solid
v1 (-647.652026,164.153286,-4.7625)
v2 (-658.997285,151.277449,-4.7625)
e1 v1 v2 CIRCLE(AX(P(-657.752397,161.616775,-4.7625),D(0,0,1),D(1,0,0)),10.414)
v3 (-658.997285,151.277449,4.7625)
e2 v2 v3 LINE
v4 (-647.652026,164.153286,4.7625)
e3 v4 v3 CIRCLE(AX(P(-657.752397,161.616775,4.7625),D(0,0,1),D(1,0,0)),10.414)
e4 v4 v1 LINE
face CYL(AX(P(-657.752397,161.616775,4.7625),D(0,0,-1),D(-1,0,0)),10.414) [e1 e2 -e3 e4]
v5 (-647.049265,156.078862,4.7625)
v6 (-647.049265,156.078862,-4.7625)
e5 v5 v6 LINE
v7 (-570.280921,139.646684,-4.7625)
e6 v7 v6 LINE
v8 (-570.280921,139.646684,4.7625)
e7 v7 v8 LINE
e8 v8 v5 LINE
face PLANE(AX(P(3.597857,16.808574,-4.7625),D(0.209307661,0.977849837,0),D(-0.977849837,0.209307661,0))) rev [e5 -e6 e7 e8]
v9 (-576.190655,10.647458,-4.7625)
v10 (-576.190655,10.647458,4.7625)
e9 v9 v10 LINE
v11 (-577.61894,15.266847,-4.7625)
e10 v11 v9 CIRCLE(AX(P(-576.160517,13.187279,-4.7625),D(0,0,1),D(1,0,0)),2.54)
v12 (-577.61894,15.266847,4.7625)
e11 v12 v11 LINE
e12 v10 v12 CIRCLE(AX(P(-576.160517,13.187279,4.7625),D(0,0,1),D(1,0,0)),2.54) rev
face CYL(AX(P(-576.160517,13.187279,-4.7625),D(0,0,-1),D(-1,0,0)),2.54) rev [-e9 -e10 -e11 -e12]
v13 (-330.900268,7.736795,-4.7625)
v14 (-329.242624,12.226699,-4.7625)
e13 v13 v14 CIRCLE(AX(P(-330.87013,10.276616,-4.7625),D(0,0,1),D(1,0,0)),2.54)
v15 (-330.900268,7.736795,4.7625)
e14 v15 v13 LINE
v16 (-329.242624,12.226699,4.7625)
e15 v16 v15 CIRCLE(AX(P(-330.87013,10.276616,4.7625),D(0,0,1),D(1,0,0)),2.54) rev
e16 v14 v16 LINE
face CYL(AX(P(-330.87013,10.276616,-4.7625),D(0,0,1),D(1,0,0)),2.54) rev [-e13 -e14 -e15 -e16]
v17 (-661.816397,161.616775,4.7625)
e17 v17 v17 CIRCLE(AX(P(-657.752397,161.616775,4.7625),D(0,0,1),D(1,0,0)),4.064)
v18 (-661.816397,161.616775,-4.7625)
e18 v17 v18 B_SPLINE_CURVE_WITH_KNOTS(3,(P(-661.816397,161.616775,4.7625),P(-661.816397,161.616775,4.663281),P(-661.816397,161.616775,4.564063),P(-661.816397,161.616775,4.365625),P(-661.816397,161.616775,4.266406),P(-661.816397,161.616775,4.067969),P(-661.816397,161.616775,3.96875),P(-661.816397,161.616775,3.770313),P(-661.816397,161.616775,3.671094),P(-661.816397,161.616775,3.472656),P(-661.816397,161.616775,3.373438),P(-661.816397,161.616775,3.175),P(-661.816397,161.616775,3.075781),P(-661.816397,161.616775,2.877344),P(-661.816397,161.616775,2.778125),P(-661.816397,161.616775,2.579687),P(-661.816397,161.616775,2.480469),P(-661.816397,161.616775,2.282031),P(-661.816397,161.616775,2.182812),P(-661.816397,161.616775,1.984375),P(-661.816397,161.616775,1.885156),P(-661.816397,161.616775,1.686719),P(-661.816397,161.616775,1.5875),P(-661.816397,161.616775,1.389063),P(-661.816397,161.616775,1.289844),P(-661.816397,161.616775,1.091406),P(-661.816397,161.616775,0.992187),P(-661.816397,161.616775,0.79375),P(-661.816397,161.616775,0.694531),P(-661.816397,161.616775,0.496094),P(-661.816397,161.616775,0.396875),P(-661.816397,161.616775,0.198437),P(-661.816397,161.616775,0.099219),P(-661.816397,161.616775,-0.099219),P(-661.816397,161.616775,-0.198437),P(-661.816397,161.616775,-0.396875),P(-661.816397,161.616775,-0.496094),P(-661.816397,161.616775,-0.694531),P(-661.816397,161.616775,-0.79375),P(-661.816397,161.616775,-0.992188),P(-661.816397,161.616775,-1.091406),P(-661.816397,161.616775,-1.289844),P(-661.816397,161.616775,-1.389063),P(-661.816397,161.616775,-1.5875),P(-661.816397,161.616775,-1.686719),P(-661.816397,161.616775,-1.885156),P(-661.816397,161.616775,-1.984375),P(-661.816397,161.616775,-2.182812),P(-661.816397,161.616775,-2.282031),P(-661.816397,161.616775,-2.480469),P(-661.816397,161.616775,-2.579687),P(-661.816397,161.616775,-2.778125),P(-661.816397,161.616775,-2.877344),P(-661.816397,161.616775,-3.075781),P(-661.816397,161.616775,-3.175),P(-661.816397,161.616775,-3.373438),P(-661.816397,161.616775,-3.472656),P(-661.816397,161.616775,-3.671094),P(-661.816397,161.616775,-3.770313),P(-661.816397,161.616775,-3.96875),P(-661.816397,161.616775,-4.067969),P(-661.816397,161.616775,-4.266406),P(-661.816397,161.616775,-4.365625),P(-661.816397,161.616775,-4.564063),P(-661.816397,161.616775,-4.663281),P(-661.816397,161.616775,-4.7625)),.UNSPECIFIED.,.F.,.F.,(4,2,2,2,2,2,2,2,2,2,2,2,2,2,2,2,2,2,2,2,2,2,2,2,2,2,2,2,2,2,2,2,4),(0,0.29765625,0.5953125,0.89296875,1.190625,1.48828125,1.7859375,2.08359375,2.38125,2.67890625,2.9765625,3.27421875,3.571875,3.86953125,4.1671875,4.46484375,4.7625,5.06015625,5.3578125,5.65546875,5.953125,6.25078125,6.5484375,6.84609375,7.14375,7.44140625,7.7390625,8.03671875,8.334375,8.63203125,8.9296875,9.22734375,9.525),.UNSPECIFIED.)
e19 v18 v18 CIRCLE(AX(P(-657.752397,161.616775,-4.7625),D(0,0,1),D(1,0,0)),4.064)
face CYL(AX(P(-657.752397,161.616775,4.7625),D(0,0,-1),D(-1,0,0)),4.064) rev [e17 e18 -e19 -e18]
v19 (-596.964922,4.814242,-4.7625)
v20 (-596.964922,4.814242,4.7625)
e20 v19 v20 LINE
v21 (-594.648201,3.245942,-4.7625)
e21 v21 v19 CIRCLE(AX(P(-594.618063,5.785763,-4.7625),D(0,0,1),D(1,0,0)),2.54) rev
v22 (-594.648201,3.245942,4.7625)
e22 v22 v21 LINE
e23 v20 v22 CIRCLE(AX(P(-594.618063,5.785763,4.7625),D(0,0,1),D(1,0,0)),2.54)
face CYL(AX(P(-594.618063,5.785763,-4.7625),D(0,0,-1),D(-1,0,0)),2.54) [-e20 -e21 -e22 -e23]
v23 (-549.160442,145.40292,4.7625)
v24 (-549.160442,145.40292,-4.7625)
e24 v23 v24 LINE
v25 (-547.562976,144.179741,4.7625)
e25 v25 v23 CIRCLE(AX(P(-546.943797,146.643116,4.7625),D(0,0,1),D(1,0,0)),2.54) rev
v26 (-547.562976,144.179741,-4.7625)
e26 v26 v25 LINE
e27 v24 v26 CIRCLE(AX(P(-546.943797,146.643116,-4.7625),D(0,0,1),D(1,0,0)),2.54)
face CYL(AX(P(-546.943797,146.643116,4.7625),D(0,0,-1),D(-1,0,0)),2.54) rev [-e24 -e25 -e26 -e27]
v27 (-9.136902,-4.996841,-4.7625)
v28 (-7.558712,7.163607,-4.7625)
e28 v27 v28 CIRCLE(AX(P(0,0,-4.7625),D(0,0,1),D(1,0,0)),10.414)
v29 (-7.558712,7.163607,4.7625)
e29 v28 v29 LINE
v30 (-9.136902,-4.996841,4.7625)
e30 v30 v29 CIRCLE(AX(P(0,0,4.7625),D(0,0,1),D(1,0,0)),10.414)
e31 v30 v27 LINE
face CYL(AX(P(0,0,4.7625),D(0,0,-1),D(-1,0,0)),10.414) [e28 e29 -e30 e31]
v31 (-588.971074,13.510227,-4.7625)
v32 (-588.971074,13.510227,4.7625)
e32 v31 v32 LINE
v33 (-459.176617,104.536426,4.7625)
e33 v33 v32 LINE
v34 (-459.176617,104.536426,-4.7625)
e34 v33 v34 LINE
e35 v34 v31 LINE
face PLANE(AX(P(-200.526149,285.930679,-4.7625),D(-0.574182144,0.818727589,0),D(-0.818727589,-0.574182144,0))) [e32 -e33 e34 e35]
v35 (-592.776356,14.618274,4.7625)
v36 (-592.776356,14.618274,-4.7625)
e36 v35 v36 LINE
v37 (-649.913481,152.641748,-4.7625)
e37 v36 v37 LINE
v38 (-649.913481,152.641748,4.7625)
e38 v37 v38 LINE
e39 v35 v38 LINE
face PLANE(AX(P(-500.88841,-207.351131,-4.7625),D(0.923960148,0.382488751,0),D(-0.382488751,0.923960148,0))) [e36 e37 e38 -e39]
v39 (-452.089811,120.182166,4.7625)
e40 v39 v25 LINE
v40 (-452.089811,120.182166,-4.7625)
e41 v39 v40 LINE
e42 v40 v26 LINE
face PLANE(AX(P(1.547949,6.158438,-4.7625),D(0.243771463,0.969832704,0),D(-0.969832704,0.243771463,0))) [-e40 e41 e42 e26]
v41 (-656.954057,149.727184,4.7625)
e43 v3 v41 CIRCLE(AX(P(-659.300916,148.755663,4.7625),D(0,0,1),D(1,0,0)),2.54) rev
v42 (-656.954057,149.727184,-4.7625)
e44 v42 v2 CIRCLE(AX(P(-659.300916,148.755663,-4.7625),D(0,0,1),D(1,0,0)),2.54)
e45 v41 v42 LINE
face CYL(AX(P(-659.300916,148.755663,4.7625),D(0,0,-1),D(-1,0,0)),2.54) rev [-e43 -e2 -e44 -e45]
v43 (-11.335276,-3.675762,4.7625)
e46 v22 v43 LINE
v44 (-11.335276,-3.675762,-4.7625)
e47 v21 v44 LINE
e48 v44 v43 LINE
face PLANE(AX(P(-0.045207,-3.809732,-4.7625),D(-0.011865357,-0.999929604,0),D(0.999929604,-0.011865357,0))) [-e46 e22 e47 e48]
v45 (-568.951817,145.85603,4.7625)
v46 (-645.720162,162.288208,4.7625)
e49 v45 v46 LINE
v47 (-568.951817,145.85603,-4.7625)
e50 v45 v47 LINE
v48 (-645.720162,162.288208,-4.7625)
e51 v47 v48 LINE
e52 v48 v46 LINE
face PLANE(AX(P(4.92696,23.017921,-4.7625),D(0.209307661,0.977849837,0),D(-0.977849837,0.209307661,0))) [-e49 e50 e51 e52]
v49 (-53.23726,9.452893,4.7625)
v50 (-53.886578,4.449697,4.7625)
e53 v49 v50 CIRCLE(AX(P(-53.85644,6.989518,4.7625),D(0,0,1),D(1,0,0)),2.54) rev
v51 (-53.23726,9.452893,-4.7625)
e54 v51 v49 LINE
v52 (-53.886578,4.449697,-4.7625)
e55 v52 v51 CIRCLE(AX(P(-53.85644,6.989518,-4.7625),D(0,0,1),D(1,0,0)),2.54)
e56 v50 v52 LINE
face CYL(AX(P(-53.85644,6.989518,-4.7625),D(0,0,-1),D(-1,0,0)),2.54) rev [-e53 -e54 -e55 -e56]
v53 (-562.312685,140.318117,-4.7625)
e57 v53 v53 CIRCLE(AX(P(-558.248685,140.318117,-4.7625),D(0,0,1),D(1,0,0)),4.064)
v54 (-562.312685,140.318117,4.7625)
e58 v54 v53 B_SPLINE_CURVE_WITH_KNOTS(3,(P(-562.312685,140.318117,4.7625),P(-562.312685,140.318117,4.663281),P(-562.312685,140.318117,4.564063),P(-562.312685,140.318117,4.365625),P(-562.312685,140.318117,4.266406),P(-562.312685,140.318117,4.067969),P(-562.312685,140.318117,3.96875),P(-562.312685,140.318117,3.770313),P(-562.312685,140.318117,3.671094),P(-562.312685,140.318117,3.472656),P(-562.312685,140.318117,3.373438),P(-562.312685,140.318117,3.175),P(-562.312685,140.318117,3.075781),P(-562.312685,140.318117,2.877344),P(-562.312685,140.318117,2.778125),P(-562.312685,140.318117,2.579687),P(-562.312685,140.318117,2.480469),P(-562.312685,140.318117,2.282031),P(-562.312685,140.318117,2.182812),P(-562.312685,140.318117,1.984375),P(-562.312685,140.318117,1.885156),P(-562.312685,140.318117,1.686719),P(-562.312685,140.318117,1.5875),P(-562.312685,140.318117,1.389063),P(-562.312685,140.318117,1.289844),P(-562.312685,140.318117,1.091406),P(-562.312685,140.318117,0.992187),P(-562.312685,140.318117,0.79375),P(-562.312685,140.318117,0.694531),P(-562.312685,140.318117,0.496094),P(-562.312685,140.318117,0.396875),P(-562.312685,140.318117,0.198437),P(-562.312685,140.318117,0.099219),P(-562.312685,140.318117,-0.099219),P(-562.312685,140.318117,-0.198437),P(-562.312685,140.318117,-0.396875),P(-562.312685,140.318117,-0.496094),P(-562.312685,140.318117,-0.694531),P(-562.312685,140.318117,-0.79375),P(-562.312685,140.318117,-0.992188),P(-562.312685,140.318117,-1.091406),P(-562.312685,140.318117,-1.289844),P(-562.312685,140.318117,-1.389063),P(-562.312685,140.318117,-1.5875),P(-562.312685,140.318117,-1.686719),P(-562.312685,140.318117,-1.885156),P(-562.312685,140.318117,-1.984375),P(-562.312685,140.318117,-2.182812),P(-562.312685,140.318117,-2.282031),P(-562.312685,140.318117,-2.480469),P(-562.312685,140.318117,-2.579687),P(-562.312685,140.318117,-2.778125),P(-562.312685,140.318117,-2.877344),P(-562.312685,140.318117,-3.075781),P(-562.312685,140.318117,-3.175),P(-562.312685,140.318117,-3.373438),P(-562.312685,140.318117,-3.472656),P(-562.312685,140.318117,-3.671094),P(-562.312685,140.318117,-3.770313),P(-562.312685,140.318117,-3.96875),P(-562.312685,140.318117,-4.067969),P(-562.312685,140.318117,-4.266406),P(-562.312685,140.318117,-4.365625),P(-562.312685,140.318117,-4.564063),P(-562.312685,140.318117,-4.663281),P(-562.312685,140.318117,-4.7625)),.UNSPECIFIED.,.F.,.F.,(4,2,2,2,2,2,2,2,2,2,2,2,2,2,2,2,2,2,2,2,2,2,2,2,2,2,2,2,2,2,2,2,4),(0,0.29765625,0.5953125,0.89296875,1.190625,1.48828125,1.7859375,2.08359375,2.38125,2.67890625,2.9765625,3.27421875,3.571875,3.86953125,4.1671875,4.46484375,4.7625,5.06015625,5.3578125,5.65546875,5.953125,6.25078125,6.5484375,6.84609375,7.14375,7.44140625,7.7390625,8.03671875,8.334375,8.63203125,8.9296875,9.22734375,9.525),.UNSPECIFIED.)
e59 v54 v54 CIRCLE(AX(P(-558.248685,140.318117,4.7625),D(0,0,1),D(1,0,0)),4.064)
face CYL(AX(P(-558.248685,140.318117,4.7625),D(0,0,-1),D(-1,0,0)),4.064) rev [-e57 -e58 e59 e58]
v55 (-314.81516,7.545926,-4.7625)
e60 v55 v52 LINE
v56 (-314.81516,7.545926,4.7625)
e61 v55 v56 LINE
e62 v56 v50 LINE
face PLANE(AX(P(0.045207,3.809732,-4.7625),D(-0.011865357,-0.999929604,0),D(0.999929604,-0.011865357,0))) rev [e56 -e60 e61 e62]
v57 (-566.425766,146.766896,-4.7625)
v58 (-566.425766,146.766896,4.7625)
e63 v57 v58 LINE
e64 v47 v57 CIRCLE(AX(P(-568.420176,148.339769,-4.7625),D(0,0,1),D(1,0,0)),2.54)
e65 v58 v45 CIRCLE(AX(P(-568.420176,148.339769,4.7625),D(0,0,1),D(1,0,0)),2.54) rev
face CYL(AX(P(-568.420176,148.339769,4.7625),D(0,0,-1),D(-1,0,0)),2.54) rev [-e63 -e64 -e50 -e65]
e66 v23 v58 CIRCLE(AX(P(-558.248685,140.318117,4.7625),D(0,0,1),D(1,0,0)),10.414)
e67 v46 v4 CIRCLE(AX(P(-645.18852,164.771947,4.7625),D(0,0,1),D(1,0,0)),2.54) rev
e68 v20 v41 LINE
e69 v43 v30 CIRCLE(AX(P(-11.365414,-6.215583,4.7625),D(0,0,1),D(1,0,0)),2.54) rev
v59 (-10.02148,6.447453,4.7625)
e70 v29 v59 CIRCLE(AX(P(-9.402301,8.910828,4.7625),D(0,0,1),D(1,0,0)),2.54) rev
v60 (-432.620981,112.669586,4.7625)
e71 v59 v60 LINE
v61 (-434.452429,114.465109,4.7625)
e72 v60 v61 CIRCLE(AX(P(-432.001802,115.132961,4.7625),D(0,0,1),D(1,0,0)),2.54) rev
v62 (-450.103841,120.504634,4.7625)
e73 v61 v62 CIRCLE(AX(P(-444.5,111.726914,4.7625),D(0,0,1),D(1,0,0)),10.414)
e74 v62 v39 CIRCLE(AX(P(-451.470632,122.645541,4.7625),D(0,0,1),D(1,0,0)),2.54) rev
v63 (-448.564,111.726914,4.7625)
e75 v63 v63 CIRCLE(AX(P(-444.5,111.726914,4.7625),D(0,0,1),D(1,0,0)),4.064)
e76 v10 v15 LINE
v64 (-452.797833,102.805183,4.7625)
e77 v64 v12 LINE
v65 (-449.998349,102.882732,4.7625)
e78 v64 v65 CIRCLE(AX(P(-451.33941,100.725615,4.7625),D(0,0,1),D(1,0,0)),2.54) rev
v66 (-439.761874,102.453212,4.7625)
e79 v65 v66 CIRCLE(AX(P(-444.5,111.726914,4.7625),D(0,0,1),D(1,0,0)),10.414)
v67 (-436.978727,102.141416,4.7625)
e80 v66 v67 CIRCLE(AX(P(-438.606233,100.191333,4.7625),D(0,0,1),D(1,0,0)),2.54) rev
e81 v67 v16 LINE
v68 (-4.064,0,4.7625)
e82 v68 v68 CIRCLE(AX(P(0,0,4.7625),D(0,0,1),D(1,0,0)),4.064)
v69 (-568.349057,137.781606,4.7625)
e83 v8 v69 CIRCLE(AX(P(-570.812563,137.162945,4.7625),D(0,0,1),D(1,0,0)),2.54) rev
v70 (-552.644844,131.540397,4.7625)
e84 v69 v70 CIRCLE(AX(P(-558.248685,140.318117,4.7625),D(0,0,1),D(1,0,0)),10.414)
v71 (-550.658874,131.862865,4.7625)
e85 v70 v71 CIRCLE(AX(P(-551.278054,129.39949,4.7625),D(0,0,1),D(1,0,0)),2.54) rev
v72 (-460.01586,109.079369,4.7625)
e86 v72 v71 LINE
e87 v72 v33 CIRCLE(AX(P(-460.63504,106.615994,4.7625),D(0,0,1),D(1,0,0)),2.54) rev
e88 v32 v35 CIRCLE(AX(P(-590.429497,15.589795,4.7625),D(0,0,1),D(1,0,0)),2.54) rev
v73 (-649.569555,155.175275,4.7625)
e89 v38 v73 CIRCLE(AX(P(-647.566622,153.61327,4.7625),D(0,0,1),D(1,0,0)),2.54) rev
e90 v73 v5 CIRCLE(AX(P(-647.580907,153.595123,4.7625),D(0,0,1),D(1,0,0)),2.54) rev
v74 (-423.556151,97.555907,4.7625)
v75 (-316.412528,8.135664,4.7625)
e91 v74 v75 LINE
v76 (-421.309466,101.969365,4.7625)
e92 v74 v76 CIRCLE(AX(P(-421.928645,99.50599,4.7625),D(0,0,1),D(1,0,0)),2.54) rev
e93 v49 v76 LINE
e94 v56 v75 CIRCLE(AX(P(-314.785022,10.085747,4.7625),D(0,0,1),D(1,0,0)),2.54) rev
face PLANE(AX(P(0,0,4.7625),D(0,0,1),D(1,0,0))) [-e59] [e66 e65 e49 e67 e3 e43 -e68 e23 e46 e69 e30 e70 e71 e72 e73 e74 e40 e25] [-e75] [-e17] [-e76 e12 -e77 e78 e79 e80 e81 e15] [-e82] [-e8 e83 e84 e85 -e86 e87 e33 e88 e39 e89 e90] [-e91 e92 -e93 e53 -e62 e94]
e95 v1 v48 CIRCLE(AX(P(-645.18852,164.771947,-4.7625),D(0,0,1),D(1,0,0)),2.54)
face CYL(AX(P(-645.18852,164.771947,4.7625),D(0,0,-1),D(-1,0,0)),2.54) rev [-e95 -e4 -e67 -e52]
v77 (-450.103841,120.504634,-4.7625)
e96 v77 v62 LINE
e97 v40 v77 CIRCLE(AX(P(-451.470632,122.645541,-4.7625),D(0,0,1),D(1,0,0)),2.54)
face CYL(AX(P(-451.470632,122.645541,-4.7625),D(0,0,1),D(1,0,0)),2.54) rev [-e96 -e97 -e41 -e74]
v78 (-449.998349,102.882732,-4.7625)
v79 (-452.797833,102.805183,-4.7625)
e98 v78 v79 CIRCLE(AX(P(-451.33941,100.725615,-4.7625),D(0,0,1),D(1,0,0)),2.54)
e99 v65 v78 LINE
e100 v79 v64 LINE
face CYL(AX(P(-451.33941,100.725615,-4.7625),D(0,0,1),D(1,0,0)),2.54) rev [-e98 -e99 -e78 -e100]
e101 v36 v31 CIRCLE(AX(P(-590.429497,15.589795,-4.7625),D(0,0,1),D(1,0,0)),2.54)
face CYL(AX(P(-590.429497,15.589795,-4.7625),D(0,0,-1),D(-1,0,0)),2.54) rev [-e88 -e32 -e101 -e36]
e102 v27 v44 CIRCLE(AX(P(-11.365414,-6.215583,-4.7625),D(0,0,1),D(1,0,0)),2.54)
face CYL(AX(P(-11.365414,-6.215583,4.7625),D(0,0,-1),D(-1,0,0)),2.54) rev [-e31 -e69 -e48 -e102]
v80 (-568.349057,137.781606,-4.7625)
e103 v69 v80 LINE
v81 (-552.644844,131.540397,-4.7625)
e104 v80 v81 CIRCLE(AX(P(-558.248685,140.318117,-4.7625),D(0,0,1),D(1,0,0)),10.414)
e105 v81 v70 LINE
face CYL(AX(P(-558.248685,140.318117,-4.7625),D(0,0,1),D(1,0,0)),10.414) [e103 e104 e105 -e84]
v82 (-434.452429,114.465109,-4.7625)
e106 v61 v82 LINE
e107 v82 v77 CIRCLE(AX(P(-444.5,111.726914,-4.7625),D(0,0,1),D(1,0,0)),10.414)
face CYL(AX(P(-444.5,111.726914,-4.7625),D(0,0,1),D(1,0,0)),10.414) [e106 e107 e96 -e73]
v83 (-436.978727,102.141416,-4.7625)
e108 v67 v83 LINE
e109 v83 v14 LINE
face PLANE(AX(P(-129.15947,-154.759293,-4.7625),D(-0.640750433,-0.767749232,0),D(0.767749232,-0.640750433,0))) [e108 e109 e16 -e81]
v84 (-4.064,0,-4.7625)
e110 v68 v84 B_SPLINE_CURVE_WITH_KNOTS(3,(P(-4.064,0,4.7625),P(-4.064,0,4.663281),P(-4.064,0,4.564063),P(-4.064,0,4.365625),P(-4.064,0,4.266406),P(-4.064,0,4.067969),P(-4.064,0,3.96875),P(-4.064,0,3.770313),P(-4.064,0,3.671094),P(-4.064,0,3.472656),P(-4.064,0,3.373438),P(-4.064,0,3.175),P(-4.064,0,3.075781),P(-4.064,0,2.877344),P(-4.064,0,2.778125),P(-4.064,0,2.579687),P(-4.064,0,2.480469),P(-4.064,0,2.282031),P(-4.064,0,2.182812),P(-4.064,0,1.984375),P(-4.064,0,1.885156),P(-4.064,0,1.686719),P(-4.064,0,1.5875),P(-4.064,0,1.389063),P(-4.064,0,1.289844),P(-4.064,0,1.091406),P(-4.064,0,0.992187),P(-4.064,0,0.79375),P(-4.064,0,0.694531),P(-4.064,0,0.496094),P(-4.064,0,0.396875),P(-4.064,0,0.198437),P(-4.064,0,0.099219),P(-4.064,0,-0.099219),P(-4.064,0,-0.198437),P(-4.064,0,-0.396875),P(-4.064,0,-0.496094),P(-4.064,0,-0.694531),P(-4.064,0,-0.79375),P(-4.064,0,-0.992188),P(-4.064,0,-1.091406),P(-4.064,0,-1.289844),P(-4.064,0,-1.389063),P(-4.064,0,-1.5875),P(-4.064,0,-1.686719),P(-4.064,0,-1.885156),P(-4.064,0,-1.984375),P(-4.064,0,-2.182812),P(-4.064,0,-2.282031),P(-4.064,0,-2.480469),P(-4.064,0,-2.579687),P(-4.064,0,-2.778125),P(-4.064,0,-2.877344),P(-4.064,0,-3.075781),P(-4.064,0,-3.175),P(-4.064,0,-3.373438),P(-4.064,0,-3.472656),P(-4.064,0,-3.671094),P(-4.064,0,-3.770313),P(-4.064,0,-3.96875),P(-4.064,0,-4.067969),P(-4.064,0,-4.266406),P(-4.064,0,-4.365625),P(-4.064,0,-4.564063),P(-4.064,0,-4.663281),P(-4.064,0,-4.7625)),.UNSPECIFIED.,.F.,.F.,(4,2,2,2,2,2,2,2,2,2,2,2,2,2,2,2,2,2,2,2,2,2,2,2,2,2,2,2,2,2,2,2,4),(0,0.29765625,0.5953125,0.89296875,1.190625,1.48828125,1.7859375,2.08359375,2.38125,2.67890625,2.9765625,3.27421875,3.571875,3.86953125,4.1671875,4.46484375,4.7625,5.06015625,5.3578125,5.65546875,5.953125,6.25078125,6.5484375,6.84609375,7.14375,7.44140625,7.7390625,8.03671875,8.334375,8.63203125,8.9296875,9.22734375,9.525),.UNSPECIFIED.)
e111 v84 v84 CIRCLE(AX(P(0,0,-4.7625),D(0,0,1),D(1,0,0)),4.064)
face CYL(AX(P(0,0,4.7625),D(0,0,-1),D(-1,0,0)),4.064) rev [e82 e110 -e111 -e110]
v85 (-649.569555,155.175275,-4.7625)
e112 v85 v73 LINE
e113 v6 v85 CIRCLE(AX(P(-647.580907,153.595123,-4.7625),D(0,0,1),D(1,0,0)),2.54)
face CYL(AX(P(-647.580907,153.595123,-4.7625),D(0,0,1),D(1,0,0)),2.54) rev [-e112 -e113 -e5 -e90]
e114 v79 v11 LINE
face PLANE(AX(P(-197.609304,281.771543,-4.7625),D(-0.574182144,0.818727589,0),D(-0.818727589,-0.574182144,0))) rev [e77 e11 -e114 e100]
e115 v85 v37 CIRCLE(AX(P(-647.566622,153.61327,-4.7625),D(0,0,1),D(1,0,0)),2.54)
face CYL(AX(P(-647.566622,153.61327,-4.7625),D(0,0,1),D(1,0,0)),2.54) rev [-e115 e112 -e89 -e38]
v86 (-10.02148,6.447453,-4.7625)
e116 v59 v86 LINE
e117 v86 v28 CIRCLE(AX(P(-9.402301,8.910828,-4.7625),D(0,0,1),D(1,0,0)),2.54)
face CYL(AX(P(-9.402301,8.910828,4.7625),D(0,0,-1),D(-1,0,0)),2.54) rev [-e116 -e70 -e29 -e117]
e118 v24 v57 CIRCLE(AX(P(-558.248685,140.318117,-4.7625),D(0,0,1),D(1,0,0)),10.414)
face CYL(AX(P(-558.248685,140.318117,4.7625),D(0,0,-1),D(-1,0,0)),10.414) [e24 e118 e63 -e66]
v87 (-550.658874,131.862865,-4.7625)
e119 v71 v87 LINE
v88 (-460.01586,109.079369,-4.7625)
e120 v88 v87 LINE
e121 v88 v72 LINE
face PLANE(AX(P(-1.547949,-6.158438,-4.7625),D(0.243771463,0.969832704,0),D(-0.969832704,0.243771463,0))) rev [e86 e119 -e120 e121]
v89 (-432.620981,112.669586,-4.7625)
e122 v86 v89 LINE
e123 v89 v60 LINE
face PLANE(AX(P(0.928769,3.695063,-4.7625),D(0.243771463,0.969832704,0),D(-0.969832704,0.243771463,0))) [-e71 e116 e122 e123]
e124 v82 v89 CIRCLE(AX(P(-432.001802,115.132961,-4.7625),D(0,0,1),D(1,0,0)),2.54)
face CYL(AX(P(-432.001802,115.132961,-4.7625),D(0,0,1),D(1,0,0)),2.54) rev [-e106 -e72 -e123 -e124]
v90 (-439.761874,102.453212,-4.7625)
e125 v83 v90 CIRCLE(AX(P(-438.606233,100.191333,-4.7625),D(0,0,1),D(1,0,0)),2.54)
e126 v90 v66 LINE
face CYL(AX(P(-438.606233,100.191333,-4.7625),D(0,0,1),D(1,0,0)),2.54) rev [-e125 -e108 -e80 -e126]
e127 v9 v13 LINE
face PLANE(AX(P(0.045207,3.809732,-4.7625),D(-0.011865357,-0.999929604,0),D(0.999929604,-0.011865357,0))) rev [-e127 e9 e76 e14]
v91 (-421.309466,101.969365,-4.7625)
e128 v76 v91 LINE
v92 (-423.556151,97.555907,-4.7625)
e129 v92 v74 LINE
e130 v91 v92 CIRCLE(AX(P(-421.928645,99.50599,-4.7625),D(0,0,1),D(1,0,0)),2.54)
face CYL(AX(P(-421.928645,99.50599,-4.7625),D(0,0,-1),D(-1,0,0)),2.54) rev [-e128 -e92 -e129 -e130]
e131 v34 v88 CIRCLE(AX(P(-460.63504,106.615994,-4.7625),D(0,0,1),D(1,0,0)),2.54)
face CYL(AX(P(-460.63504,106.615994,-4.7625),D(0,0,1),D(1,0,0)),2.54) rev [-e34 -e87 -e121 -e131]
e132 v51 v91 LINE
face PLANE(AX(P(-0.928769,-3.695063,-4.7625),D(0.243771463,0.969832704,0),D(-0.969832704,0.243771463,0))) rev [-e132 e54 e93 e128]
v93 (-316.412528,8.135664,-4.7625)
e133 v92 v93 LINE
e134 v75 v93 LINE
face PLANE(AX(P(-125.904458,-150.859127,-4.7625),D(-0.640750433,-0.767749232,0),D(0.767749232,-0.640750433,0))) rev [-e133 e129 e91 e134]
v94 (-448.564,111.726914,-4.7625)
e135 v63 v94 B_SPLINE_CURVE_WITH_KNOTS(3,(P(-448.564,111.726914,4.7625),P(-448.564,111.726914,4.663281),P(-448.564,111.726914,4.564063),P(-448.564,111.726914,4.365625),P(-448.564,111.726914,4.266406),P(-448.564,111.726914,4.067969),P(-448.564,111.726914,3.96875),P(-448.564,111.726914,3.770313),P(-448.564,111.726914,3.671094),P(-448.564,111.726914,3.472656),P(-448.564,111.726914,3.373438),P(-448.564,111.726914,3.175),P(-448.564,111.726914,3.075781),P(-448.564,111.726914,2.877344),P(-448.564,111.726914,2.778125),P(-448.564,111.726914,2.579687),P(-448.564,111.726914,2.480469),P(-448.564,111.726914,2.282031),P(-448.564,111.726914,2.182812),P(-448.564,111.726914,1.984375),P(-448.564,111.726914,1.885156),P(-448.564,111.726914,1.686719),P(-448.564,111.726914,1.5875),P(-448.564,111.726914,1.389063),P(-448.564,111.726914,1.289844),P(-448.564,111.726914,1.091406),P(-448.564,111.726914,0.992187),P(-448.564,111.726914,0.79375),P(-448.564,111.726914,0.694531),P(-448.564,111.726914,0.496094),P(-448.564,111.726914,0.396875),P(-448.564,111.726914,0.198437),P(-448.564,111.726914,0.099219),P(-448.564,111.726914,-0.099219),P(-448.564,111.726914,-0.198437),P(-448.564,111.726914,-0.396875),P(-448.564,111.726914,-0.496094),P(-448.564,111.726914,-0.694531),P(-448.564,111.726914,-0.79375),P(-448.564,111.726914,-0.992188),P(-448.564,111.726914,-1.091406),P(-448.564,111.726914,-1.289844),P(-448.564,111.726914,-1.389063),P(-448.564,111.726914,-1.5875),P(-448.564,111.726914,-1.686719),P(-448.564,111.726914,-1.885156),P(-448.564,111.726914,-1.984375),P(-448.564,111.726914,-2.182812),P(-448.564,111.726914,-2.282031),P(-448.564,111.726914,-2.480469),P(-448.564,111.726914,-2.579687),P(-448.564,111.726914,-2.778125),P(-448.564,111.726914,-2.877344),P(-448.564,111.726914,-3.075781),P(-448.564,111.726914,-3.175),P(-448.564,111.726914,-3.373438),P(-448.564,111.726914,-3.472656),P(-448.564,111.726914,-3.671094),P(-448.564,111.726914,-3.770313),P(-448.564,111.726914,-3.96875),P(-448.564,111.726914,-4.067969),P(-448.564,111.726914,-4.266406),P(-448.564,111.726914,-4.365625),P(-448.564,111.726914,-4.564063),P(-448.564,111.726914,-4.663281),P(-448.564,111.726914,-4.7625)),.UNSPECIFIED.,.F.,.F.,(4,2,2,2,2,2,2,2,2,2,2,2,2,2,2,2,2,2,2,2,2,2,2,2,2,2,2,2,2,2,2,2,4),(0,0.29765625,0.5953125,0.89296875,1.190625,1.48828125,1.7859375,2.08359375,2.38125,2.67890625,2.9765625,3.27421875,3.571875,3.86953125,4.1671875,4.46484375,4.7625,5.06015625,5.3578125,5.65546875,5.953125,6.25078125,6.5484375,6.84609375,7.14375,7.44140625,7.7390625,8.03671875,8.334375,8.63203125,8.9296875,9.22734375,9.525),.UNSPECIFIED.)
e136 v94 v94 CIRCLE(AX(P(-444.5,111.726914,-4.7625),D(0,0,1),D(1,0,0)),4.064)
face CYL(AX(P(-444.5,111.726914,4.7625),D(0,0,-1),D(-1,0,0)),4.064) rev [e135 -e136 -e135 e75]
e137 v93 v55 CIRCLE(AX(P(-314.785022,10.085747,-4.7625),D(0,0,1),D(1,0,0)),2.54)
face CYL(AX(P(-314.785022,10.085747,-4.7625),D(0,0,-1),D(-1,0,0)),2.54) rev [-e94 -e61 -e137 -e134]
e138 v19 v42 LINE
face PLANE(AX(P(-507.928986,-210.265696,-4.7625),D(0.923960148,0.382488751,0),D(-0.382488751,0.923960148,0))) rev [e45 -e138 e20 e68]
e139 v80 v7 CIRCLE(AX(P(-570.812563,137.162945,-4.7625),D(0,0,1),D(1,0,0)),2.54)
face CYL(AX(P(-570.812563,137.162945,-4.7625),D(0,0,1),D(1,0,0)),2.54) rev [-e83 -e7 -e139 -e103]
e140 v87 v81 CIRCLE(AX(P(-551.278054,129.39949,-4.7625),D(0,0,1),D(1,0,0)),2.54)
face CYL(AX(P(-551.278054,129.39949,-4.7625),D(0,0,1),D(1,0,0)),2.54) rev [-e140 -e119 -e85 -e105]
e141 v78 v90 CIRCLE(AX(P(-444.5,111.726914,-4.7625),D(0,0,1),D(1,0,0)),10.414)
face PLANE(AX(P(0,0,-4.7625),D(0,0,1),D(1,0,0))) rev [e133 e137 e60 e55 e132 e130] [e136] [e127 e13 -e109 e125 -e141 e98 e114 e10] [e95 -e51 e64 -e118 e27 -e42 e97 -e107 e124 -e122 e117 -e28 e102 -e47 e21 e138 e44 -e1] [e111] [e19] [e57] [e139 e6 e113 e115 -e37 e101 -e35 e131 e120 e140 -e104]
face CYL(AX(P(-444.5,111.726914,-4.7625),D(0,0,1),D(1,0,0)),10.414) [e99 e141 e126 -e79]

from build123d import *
from build123d.topology import SkipClean

# Parameters (mm, degrees)
SKETCH1_R               = 4.064
BOSS_EXTRUDE1_DEPTH     = 4.7625
CUT_EXTRUDE2_DEPTH      = 690.973625243
CUT_EXTRUDE2_DEPTH_BACK = 690.973625243
FILLET5_R               = 2.54


with BuildPart() as part:
    # Sketch1 → Boss-Extrude1 (new, symmetric)
    with BuildSketch(Plane.XY):
        with BuildLine():
            Line((-668.166397408, 161.616774863), (-668.166397408, 18.64362624))
            Line((-668.166397408, 18.64362624), (-87.838367094, -105.574938169))
            Line((-87.838367094, -105.574938169), (7.477398085, -7.248442169))
            ThreePointArc((7.477398085, -7.248442169), (10.016034099, 2.851395611), (2.538636014, 10.09983778))
            Line((2.538636014, 10.09983778), (-555.710049471, 150.417954639))
            ThreePointArc((-555.710049471, 150.417954639), (-555.889133178, 150.461287413), (-556.068955499, 150.501445056))
            Line((-556.068955499, 150.501445056), (-655.572667421, 171.800103061))
            ThreePointArc((-655.572667421, 171.800103061), (-664.300362279, 169.714648167), (-668.166397408, 161.616774863))
        make_face()
        with Locations(Location((-444.5, 111.726914125, 0), (0, 0, 180))):
            Circle(SKETCH1_R, mode=Mode.SUBTRACT)
        with Locations(Location((-657.752397408, 161.616774863, 0), (0, 0, 180))):
            Circle(SKETCH1_R, mode=Mode.SUBTRACT)
        with Locations(Location((0, 0, 0), (0, 0, 180))):
            Circle(SKETCH1_R, mode=Mode.SUBTRACT)
        with Locations(Location((-558.248685485, 140.318116858, 0), (0, 0, 180))):
            Circle(SKETCH1_R, mode=Mode.SUBTRACT)
    extrude(amount=BOSS_EXTRUDE1_DEPTH, both=True)

    # Sketch3 → Cut-Extrude2 (cut, two sides: drawn at the far end of the back side and taken through both)
    with SkipClean():  # the faces are left unmerged after this step: merging them gives an invalid solid
        with BuildSketch(Plane.XY.offset(-CUT_EXTRUDE2_DEPTH_BACK)):
            with BuildLine():
                Line((-441.961363863, 121.826751874), (-555.710049471, 150.417954639))
                ThreePointArc((-555.710049471, 150.417954639), (-551.509786292, 148.257804111), (-548.695715232, 144.464459263))
                Line((-548.695715232, 144.464459263), (-450.957072675, 119.897447062))
                ThreePointArc((-450.957072675, 119.897447062), (-446.683824739, 121.909364985), (-441.961363863, 121.826751874))
            make_face()
            with BuildLine():
                Line((2.538636014, 10.09983778), (-441.961363863, 121.826751874))
                ThreePointArc((-441.961363863, 121.826751874), (-436.714943747, 118.643871197), (-434.171590545, 113.059338277))
                Line((-434.171590545, 113.059338277), (-8.470870908, 6.057701053))
                ThreePointArc((-8.470870908, 6.057701053), (-3.589229728, 9.775930951), (2.538636014, 10.09983778))
            make_face()
            with BuildLine():
                ThreePointArc((-567.282647841, 145.498746179), (-562.491547061, 149.8286122), (-556.068955499, 150.501445056))
                Line((-556.068955499, 150.501445056), (-655.572667421, 171.800103061))
                ThreePointArc((-655.572667421, 171.800103061), (-649.98823881, 168.557180995), (-647.389331402, 162.645492005))
                Line((-647.389331402, 162.645492005), (-567.282647841, 145.498746179))
            make_face()
            with BuildLine():
                Line((-454.629375008, 107.72545344), (-551.79161281, 132.147583922))
                ThreePointArc((-551.79161281, 132.147583922), (-562.318768923, 130.73240787), (-568.611751491, 139.289399717))
                Line((-568.611751491, 139.289399717), (-648.718435052, 156.436145543))
                ThreePointArc((-648.718435052, 156.436145543), (-649.539598332, 155.213546979), (-650.525019748, 154.119014654))
                Line((-650.525019748, 154.119014654), (-591.564686258, 11.691300387))
                Line((-591.564686258, 11.691300387), (-454.629375008, 107.72545344))
            make_face()
            with BuildLine():
                ThreePointArc((-657.565596078, 151.204450375), (-665.04986433, 154.187214141), (-668.166397408, 161.616774863))
                Line((-668.166397408, 161.616774863), (-668.166397408, 18.64362624))
                Line((-668.166397408, 18.64362624), (-596.32392942, 3.265826494))
                Line((-596.32392942, 3.265826494), (-657.565596078, 151.204450375))
            make_face()
            with BuildLine():
                Line((-87.838367094, -105.574938169), (7.477398085, -7.248442169))
                ThreePointArc((7.477398085, -7.248442169), (-2.105505073, -10.198933493), (-9.73654702, -3.694732483))
                Line((-9.73654702, -3.694732483), (-596.32392942, 3.265826494))
                Line((-596.32392942, 3.265826494), (-87.838367094, -105.574938169))
            make_face()
            with BuildLine():
                ThreePointArc((-438.373626695, 103.305575388), (-444.936585447, 101.322069621), (-451.310312416, 103.848396447))
                Line((-451.310312416, 103.848396447), (-584.072378221, 10.740983679))
                Line((-584.072378221, 10.740983679), (-323.761303231, 7.652082274))
                Line((-323.761303231, 7.652082274), (-438.373626695, 103.305575388))
            make_face()
            Polygon((-32.313863809, 4.193710765), (-432.091689332, 104.679521297), (-315.718749539, 7.556647781), align=None)
        extrude(amount=CUT_EXTRUDE2_DEPTH + CUT_EXTRUDE2_DEPTH_BACK, mode=Mode.SUBTRACT)

    # Fillet5
    # the kernel refuses this fillet: 2.54 mm, written as the material it adds along each edge
    with BuildSketch(Plane(origin=(-432.091689332, 104.679521297, 4.7625), x_dir=(0.9698327040744903, -0.24377146286545154, 0), z_dir=(0, 0, -1))) as fillet5_piece_1:
        with BuildLine():
            CenterArc((FILLET5_R * 4.37701255665, FILLET5_R), FILLET5_R, 115.738557535, 154.261442465)
            Line((FILLET5_R * 3.94274718517, FILLET5_R * 1.90078498386), (0, 0))
            Line((0, 0), (FILLET5_R * 4.37701255665, 0))
        make_face()
    extrude(amount=9.525)
    with BuildSketch(Plane(origin=(-32.313863809, 4.193710765, -4.7625), x_dir=(-0.9698327040744894, 0.24377146286545465, 0), z_dir=(0, 0, 1))) as fillet5_piece_2:
        with BuildLine():
            CenterArc((FILLET5_R * 8.4937923688, FILLET5_R), FILLET5_R, 103.429391771, 166.570608229)
            Line((FILLET5_R * 8.26154547816, FILLET5_R * 1.97265686744), (0, 0))
            Line((0, 0), (FILLET5_R * 8.4937923688, 0))
        make_face()
    extrude(amount=9.525)
    with BuildSketch(Plane(origin=(-315.718749539, 7.556647781, 4.7625), x_dir=(-0.7677492318062843, 0.6407504327434048, 0), z_dir=(0, 0, -1))) as fillet5_piece_3:
        with BuildLine():
            CenterArc((FILLET5_R * 0.355768854879, FILLET5_R), FILLET5_R, 230.832050694, 39.167949306)
            Line((-FILLET5_R * 0.275826852618, FILLET5_R * 0.224702081603), (0, 0))
            Line((0, 0), (FILLET5_R * 0.355768854879, 0))
        make_face()
    extrude(amount=9.525)
    with BuildSketch(Plane(origin=(-450.957072675, 119.897447062, 4.7625), x_dir=(-0.9698327040744915, 0.24377146286544657, 0), z_dir=(0, 0, -1))) as fillet5_piece_4:
        with BuildLine():
            CenterArc((1.167973372, 2.54), FILLET5_R, 223.335922736, 46.664077264)
            ThreePointArc((-0.679476901, 0.796862745), (-0.329715617, 0.406977742), (0, 0))
            Line((0, 0), (1.167973372, 0))
        make_face()
    extrude(amount=9.525)
    with BuildSketch(Plane(origin=(-548.695715232, 144.464459263, -4.7625), x_dir=(-0.44376973183337304, 0.8961408511548484, 0), z_dir=(0, 0, 1))) as fillet5_piece_5:
        with BuildLine():
            CenterArc((1.174934772, -2.536787354), FILLET5_R, 92.882026708, 46.664077264)
            Line((-0.75782313, -0.888744002), (0, 0))
            ThreePointArc((0, 0), (0.523612236, -0.013171849), (1.047224471, 0))
        make_face()
    extrude(amount=9.525)
    with BuildSketch(Plane(origin=(-9.73654702, -3.694732483, 4.7625), x_dir=(0.4182943281117258, -0.9083115407554614, 0), z_dir=(0, 0, -1)), Plane(origin=(-650.525019748, 154.119014654, 4.7625), x_dir=(0.670494914726067, 0.7419141253045962, 0), z_dir=(0, 0, -1))) as fillet5_piece_6:
        with BuildLine():
            CenterArc((1.608371465, 2.533976504), FILLET5_R, 205.406798902, 60.646529945)
            Line((-0.68597088, 1.444209004), (0, 0))
            ThreePointArc((0, 0), (0.71677424, 0.024696333), (1.43354848, 0))
        make_face()
    extrude(amount=9.525)
    with BuildSketch(Plane(origin=(-647.389331402, 162.645492005, 4.7625), x_dir=(-0.17163878928589119, 0.985159949456165, 0), z_dir=(0, 0, -1))) as fillet5_piece_7:
        with BuildLine():
            CenterArc((1.717153467, 2.533133012), FILLET5_R, 201.964897943, 63.821031296)
            Line((-0.638476016, 1.583075254), (0, 0))
            ThreePointArc((0, 0), (0.765253175, 0.028154653), (1.530506351, 0))
        make_face()
    extrude(amount=9.525)
    with BuildSketch(Plane(origin=(-567.282647841, 145.498746179, -4.7625), x_dir=(-0.9778498365567232, 0.20930766146032473, 0), z_dir=(0, 0, 1))) as fillet5_piece_8:
        with BuildLine():
            CenterArc((1.706979462, -2.54), FILLET5_R, 90, 63.821031296)
            ThreePointArc((-0.57246828, -1.419411765), (-0.260123144, -0.720236806), (0, 0))
            Line((0, 0), (1.706979462, 0))
        make_face()
    extrude(amount=9.525)
    with BuildSketch(Plane(origin=(-648.718435052, 156.436145543, 4.7625), x_dir=(0.9778498365567261, -0.20930766146031107, 0), z_dir=(0, 0, -1))) as fillet5_piece_9:
        with BuildLine():
            CenterArc((1.706979462, 2.54), FILLET5_R, 206.178968704, 63.821031296)
            ThreePointArc((-0.57246828, 1.419411765), (-0.260123144, 0.720236806), (0, 0))
            Line((0, 0), (1.706979462, 0))
        make_face()
    extrude(amount=9.525)
    with BuildSketch(Plane(origin=(-568.611751491, 139.289399717, -4.7625), x_dir=(0.1716387892858222, -0.9851599494561769, 0), z_dir=(0, 0, 1))) as fillet5_piece_10:
        with BuildLine():
            CenterArc((1.717153467, -2.533133012), FILLET5_R, 94.214070761, 63.821031296)
            Line((-0.638476016, -1.583075254), (0, 0))
            ThreePointArc((0, 0), (0.765253175, -0.028154653), (1.530506351, 0))
        make_face()
    extrude(amount=9.525)
    with BuildSketch(Plane(origin=(-551.79161281, 132.147583922, -4.7625), x_dir=(0.9698327040744915, -0.24377146286544651, 0), z_dir=(0, 0, 1))) as fillet5_piece_11:
        with BuildLine():
            CenterArc((1.167973372, -2.54), FILLET5_R, 90, 46.664077264)
            ThreePointArc((-0.679476901, -0.796862745), (-0.329715617, -0.406977742), (0, 0))
            Line((0, 0), (1.167973372, 0))
        make_face()
    extrude(amount=9.525)
    with BuildSketch(Plane(origin=(-454.629375008, 107.72545344, -4.7625), x_dir=(-0.9698327040744891, 0.24377146286545595, 0), z_dir=(0, 0, 1))) as fillet5_piece_12:
        with BuildLine():
            CenterArc((FILLET5_R * 2.18662804116, FILLET5_R), FILLET5_R, 139.151619975, 130.848380025)
            Line((FILLET5_R * 1.4301849976, FILLET5_R * 1.65405957057), (0, 0))
            Line((0, 0), (FILLET5_R * 2.18662804116, 0))
        make_face()
    extrude(amount=9.525)
    with BuildSketch(Plane(origin=(-591.564686258, 11.691300387, 4.7625), x_dir=(-0.38248875056705317, 0.9239601483233217, 0), z_dir=(0, 0, -1))) as fillet5_piece_13:
        with BuildLine():
            CenterArc((FILLET5_R * 1.24718774025, FILLET5_R), FILLET5_R, 167.445549697, 102.554450303)
            Line((FILLET5_R * 0.271097864551, FILLET5_R * 1.21736732635), (0, 0))
            Line((0, 0), (FILLET5_R * 1.24718774025, 0))
        make_face()
    extrude(amount=9.525)
    with BuildSketch(Plane(origin=(-451.310312416, 103.848396447, -4.7625), x_dir=(0.8053622455004413, -0.5927829733743091, 0), z_dir=(0, 0, 1))) as fillet5_piece_14:
        with BuildLine():
            CenterArc((1.827697503, -2.532219008), FILLET5_R, 94.485895933, 66.911227563)
            Line((-0.579593582, -1.721941504), (0, 0))
            ThreePointArc((0, 0), (0.814517365, -0.031902068), (1.629034731, 0))
        make_face()
    extrude(amount=9.525)
    with BuildSketch(Plane(origin=(-438.373626695, 103.305575388, -4.7625), x_dir=(-0.8521900532222071, -0.5232323701656196, 0), z_dir=(0, 0, 1))) as fillet5_piece_15:
        with BuildLine():
            CenterArc((1.827697503, 2.532219008), FILLET5_R, 198.602876504, 66.911227563)
            Line((-0.579593582, 1.721941504), (0, 0))
            ThreePointArc((0, 0), (0.814517365, 0.031902068), (1.629034731, 0))
        make_face()
    extrude(amount=9.525)
    with BuildSketch(Plane(origin=(-323.761303231, 7.652082274, 4.7625), x_dir=(-0.9999296041682059, 0.011865357475233242, 0), z_dir=(0, 0, -1))) as fillet5_piece_16:
        with BuildLine():
            CenterArc((FILLET5_R * 2.8108137806, FILLET5_R), FILLET5_R, 129.167949306, 140.832050694)
            Line((FILLET5_R * 2.1792180731, FILLET5_R * 1.7752979184), (0, 0))
            Line((0, 0), (FILLET5_R * 2.8108137806, 0))
        make_face()
    extrude(amount=9.525)
    with BuildSketch(Plane(origin=(-584.072378221, 10.740983679, 4.7625), x_dir=(0.8187275892564178, 0.5741821440887678, 0), z_dir=(0, 0, -1))) as fillet5_piece_17:
        with BuildLine():
            CenterArc((FILLET5_R * 3.10325901667, FILLET5_R), FILLET5_R, 125.722228204, 144.277771796)
            Line((FILLET5_R * 2.51940279709, FILLET5_R * 1.81185707785), (0, 0))
            Line((0, 0), (FILLET5_R * 3.10325901667, 0))
        make_face()
    extrude(amount=9.525)
    with BuildSketch(Plane(origin=(-8.470870908, 6.057701053, 4.7625), x_dir=(-0.9698327040744897, 0.2437714628654535, 0), z_dir=(0, 0, -1))) as fillet5_piece_18:
        with BuildLine():
            CenterArc((1.598841985, 2.54), FILLET5_R, 209.353470055, 60.646529945)
            ThreePointArc((-0.61505297, 1.294901961), (-0.285218673, 0.658046752), (0, 0))
            Line((0, 0), (1.598841985, 0))
        make_face()
    extrude(amount=9.525)
    with BuildSketch(Plane(origin=(-434.171590545, 113.059338277, -4.7625), x_dir=(-0.19590431977265832, 0.9806230149728344, 0), z_dir=(0, 0, 1)), Plane(origin=(-657.565596078, 151.204450375, 4.7625), x_dir=(-0.9987026389046928, 0.05092189160668163, 0), z_dir=(0, 0, -1))) as fillet5_piece_19:
        with BuildLine():
            CenterArc((1.608371465, -2.533976504), FILLET5_R, 93.946671153, 60.646529945)
            Line((-0.68597088, -1.444209004), (0, 0))
            ThreePointArc((0, 0), (0.71677424, -0.024696333), (1.43354848, 0))
        make_face()
    extrude(amount=9.525)
    # the kernel refuses this fillet: 2.54 mm, written as the material it takes off along each edge
    with BuildSketch(Plane(origin=(-596.32392942, 3.265826494, -8.952115902), x_dir=(0.999929604168206, -0.011865357475233589, 0), z_dir=(0, 0, 1))) as fillet5_2_piece_1:
        with BuildLine():
            CenterArc((FILLET5_R * 0.659782031773, FILLET5_R), FILLET5_R, 203.167777901, 66.832222099)
            Line((-FILLET5_R * 0.259574707851, FILLET5_R * 0.606575057594), (0, 0))
            Line((0, 0), (FILLET5_R * 0.659782031773, 0))
        make_face()
    extrude(amount=17.904231804, mode=Mode.SUBTRACT)


solid = part.part
